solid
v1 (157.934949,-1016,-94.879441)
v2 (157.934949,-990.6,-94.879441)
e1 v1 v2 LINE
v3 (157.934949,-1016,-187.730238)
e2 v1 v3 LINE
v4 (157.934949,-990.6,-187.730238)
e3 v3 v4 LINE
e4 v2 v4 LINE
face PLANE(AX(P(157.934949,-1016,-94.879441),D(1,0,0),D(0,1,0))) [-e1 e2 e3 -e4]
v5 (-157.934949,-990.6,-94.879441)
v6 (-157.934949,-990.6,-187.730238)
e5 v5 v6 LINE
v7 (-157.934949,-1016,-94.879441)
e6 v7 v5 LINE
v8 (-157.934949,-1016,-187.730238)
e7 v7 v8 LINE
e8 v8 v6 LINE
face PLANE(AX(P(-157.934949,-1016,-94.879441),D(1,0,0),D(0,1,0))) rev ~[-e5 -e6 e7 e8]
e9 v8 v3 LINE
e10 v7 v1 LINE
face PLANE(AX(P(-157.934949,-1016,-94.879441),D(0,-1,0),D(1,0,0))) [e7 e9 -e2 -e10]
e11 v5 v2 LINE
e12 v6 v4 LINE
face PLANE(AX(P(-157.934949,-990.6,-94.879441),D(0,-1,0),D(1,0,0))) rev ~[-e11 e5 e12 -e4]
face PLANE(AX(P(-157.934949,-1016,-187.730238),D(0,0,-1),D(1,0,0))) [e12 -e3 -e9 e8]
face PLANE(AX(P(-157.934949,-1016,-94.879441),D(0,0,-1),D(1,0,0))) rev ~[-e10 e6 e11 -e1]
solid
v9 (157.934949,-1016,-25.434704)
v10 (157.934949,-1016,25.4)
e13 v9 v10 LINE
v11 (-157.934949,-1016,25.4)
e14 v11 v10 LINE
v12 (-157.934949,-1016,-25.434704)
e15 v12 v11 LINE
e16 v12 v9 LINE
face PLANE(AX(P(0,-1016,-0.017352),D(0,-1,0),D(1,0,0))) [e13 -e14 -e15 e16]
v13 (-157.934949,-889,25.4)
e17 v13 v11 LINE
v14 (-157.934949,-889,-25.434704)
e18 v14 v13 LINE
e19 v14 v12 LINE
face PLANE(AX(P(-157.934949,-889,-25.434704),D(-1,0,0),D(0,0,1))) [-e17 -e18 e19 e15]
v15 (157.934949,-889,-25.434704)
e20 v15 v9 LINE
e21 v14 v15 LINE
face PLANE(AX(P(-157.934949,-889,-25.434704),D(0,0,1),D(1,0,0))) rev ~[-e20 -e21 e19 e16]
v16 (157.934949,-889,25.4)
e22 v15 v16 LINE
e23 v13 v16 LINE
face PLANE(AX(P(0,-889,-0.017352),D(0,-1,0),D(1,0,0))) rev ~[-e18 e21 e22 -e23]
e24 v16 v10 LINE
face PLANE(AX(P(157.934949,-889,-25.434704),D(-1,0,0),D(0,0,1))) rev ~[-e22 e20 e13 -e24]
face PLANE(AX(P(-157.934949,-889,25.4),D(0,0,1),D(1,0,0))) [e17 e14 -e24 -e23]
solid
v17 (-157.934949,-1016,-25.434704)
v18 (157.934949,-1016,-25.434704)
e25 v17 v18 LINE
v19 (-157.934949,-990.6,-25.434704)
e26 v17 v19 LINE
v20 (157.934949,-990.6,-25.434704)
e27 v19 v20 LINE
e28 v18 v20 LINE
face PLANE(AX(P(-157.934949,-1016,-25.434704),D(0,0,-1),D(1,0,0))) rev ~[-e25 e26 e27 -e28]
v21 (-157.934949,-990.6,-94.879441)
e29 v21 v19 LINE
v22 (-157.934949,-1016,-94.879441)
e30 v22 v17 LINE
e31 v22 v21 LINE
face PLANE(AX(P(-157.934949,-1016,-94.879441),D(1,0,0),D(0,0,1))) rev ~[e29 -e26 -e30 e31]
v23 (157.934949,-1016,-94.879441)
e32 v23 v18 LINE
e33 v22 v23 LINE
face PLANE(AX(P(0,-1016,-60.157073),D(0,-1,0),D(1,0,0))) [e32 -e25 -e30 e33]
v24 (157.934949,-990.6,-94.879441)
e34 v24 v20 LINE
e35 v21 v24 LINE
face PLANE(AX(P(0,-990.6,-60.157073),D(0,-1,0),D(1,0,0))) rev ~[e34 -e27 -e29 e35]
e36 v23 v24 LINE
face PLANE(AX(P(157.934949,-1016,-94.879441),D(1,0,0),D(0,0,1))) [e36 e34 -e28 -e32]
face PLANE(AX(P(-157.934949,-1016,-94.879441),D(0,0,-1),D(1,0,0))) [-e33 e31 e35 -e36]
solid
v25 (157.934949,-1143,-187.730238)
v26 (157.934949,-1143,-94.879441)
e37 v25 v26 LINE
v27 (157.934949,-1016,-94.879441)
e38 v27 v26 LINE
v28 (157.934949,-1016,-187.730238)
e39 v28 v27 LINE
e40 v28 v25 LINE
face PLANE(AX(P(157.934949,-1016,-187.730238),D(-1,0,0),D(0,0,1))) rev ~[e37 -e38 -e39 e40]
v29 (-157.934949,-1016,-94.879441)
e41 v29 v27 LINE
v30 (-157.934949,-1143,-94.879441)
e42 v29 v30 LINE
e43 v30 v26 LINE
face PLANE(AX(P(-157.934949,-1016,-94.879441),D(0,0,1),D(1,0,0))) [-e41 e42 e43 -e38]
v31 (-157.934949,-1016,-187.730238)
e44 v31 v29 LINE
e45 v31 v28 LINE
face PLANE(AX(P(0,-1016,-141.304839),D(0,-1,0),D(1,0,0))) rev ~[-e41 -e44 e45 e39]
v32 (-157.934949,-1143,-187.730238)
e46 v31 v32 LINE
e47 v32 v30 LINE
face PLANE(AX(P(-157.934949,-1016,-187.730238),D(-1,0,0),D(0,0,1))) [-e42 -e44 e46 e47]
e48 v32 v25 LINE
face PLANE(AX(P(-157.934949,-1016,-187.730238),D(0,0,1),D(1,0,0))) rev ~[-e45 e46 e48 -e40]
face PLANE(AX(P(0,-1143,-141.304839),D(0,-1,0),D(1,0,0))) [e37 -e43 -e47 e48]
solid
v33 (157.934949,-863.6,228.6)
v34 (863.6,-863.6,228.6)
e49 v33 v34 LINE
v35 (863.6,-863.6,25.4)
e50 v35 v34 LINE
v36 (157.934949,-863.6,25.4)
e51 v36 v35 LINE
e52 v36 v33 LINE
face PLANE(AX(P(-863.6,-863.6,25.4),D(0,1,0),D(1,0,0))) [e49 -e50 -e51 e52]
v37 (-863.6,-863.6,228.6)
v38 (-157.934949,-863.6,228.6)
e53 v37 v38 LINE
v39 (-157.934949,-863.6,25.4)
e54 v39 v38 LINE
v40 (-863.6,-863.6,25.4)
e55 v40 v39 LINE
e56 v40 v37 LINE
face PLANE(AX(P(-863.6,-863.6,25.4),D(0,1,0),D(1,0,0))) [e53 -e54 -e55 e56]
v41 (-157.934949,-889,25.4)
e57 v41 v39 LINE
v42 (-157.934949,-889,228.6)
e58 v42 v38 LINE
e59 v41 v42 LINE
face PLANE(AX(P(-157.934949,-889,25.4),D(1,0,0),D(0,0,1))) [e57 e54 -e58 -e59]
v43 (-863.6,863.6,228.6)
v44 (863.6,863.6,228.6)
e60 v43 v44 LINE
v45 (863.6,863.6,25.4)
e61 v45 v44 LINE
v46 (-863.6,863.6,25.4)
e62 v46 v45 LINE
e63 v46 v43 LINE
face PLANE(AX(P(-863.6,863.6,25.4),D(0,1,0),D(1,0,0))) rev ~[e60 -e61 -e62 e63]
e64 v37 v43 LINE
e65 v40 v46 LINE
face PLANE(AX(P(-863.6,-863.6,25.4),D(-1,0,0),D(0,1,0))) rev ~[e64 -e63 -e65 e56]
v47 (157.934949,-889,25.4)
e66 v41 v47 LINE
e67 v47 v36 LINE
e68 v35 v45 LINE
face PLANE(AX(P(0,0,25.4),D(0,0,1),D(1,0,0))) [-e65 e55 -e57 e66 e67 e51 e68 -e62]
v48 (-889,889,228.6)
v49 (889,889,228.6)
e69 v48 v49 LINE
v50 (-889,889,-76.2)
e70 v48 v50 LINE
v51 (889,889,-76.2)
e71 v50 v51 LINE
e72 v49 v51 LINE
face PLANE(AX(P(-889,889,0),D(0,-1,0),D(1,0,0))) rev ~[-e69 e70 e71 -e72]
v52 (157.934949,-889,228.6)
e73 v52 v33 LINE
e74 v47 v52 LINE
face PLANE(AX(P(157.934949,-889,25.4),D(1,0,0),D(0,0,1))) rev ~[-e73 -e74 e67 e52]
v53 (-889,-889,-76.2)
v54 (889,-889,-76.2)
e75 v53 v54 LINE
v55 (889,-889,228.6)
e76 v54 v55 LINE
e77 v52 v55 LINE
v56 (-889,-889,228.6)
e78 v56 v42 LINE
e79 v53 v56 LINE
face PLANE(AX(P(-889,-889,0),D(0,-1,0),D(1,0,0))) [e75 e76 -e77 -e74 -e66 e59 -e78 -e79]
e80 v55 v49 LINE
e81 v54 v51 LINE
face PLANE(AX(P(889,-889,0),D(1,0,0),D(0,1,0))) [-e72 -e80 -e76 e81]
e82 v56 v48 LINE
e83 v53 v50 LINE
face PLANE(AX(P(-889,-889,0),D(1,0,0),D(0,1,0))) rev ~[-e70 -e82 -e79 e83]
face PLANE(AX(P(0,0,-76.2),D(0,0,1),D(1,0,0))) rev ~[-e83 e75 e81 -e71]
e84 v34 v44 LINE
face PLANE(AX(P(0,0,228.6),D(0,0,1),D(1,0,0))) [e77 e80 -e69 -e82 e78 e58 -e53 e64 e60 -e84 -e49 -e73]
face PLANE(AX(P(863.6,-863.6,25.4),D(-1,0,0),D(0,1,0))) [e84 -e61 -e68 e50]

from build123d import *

# Parameters (mm, degrees)
F0_W      = 1778
F0_H      = 1778
F1_DEPTH  = 25.4
F2_W      = 1778
F2_H      = 1778
F2_W_2    = 1727.2
F2_H_2    = 1727.2
F3_DEPTH  = 203.2
F4_W      = 315.869897604
F4_H      = 203.2
F5_DEPTH  = 25.4
F7_DEPTH  = 76.2
F8_W      = 315.869897604
F8_H      = 50.8347044975
F9_DEPTH  = 127
F10_W     = 315.869897604
F10_H     = 69.4447364658
F11_DEPTH = 25.4
F12_W     = 315.869897604
F12_H     = 92.8507968783
F13_DEPTH = 127
F16_DEPTH = 92.8507968783


with BuildPart() as f1:
    # F0 (on Top) → F1 (new body)
    with BuildSketch(Plane.XY):
        Rectangle(F0_W, F0_H)
    extrude(amount=F1_DEPTH)


with BuildPart() as f3:
    # F2 (on face) → F3 (new body)
    with BuildSketch(Plane.XY.offset(25.4)):
        Rectangle(F2_W, F2_H)
        Rectangle(F2_W_2, F2_H_2, mode=Mode.SUBTRACT)
    extrude(amount=F3_DEPTH)

    # F4 (on face) → F5 (cut)
    with BuildSketch(Plane.XZ.offset(889)):
        with Locations((0, 127)):
            Rectangle(F4_W, F4_H)
    extrude(amount=-F5_DEPTH, mode=Mode.SUBTRACT)


with BuildPart() as f1_1:
    add(f1.part)

    # F6: union F3
    add(f3.part)

    # F7 (add): a face of the model
    f7_faces = [f1_1.faces().sort_by_distance(p)[0] for p in [
        (0, 0, 0),
    ]]
    extrude(f7_faces, amount=F7_DEPTH)


with BuildPart() as f9:
    # F8 (on face) → F9 (new body)
    with BuildSketch(Plane.XZ.offset(889)):
        with Locations((0, -0.0173522487)):
            Rectangle(F8_W, F8_H)
    extrude(amount=F9_DEPTH)


with BuildPart() as f11:
    # F10 (on face) → F11 (new body)
    with BuildSketch(Plane.XZ.offset(1016)):
        with Locations((0, -60.1570727304)):
            Rectangle(F10_W, F10_H)
    extrude(amount=-F11_DEPTH)


with BuildPart() as f13:
    # F12 (on face) → F13 (new body)
    with BuildSketch(Plane.XZ.offset(1016)):
        with Locations((0, -141.3048394024)):
            Rectangle(F12_W, F12_H)
    extrude(amount=F13_DEPTH)


with BuildPart() as f16:
    # F16 (new, through all): a face of the model
    f16_faces = [f11.part.faces().sort_by_distance(p)[0] for p in [
        (0, -1003.3, -94.8794409633),
    ]]
    extrude(f16_faces, amount=F16_DEPTH)


solid = Compound([f1_1.part, f9.part, f11.part, f13.part, f16.part])
